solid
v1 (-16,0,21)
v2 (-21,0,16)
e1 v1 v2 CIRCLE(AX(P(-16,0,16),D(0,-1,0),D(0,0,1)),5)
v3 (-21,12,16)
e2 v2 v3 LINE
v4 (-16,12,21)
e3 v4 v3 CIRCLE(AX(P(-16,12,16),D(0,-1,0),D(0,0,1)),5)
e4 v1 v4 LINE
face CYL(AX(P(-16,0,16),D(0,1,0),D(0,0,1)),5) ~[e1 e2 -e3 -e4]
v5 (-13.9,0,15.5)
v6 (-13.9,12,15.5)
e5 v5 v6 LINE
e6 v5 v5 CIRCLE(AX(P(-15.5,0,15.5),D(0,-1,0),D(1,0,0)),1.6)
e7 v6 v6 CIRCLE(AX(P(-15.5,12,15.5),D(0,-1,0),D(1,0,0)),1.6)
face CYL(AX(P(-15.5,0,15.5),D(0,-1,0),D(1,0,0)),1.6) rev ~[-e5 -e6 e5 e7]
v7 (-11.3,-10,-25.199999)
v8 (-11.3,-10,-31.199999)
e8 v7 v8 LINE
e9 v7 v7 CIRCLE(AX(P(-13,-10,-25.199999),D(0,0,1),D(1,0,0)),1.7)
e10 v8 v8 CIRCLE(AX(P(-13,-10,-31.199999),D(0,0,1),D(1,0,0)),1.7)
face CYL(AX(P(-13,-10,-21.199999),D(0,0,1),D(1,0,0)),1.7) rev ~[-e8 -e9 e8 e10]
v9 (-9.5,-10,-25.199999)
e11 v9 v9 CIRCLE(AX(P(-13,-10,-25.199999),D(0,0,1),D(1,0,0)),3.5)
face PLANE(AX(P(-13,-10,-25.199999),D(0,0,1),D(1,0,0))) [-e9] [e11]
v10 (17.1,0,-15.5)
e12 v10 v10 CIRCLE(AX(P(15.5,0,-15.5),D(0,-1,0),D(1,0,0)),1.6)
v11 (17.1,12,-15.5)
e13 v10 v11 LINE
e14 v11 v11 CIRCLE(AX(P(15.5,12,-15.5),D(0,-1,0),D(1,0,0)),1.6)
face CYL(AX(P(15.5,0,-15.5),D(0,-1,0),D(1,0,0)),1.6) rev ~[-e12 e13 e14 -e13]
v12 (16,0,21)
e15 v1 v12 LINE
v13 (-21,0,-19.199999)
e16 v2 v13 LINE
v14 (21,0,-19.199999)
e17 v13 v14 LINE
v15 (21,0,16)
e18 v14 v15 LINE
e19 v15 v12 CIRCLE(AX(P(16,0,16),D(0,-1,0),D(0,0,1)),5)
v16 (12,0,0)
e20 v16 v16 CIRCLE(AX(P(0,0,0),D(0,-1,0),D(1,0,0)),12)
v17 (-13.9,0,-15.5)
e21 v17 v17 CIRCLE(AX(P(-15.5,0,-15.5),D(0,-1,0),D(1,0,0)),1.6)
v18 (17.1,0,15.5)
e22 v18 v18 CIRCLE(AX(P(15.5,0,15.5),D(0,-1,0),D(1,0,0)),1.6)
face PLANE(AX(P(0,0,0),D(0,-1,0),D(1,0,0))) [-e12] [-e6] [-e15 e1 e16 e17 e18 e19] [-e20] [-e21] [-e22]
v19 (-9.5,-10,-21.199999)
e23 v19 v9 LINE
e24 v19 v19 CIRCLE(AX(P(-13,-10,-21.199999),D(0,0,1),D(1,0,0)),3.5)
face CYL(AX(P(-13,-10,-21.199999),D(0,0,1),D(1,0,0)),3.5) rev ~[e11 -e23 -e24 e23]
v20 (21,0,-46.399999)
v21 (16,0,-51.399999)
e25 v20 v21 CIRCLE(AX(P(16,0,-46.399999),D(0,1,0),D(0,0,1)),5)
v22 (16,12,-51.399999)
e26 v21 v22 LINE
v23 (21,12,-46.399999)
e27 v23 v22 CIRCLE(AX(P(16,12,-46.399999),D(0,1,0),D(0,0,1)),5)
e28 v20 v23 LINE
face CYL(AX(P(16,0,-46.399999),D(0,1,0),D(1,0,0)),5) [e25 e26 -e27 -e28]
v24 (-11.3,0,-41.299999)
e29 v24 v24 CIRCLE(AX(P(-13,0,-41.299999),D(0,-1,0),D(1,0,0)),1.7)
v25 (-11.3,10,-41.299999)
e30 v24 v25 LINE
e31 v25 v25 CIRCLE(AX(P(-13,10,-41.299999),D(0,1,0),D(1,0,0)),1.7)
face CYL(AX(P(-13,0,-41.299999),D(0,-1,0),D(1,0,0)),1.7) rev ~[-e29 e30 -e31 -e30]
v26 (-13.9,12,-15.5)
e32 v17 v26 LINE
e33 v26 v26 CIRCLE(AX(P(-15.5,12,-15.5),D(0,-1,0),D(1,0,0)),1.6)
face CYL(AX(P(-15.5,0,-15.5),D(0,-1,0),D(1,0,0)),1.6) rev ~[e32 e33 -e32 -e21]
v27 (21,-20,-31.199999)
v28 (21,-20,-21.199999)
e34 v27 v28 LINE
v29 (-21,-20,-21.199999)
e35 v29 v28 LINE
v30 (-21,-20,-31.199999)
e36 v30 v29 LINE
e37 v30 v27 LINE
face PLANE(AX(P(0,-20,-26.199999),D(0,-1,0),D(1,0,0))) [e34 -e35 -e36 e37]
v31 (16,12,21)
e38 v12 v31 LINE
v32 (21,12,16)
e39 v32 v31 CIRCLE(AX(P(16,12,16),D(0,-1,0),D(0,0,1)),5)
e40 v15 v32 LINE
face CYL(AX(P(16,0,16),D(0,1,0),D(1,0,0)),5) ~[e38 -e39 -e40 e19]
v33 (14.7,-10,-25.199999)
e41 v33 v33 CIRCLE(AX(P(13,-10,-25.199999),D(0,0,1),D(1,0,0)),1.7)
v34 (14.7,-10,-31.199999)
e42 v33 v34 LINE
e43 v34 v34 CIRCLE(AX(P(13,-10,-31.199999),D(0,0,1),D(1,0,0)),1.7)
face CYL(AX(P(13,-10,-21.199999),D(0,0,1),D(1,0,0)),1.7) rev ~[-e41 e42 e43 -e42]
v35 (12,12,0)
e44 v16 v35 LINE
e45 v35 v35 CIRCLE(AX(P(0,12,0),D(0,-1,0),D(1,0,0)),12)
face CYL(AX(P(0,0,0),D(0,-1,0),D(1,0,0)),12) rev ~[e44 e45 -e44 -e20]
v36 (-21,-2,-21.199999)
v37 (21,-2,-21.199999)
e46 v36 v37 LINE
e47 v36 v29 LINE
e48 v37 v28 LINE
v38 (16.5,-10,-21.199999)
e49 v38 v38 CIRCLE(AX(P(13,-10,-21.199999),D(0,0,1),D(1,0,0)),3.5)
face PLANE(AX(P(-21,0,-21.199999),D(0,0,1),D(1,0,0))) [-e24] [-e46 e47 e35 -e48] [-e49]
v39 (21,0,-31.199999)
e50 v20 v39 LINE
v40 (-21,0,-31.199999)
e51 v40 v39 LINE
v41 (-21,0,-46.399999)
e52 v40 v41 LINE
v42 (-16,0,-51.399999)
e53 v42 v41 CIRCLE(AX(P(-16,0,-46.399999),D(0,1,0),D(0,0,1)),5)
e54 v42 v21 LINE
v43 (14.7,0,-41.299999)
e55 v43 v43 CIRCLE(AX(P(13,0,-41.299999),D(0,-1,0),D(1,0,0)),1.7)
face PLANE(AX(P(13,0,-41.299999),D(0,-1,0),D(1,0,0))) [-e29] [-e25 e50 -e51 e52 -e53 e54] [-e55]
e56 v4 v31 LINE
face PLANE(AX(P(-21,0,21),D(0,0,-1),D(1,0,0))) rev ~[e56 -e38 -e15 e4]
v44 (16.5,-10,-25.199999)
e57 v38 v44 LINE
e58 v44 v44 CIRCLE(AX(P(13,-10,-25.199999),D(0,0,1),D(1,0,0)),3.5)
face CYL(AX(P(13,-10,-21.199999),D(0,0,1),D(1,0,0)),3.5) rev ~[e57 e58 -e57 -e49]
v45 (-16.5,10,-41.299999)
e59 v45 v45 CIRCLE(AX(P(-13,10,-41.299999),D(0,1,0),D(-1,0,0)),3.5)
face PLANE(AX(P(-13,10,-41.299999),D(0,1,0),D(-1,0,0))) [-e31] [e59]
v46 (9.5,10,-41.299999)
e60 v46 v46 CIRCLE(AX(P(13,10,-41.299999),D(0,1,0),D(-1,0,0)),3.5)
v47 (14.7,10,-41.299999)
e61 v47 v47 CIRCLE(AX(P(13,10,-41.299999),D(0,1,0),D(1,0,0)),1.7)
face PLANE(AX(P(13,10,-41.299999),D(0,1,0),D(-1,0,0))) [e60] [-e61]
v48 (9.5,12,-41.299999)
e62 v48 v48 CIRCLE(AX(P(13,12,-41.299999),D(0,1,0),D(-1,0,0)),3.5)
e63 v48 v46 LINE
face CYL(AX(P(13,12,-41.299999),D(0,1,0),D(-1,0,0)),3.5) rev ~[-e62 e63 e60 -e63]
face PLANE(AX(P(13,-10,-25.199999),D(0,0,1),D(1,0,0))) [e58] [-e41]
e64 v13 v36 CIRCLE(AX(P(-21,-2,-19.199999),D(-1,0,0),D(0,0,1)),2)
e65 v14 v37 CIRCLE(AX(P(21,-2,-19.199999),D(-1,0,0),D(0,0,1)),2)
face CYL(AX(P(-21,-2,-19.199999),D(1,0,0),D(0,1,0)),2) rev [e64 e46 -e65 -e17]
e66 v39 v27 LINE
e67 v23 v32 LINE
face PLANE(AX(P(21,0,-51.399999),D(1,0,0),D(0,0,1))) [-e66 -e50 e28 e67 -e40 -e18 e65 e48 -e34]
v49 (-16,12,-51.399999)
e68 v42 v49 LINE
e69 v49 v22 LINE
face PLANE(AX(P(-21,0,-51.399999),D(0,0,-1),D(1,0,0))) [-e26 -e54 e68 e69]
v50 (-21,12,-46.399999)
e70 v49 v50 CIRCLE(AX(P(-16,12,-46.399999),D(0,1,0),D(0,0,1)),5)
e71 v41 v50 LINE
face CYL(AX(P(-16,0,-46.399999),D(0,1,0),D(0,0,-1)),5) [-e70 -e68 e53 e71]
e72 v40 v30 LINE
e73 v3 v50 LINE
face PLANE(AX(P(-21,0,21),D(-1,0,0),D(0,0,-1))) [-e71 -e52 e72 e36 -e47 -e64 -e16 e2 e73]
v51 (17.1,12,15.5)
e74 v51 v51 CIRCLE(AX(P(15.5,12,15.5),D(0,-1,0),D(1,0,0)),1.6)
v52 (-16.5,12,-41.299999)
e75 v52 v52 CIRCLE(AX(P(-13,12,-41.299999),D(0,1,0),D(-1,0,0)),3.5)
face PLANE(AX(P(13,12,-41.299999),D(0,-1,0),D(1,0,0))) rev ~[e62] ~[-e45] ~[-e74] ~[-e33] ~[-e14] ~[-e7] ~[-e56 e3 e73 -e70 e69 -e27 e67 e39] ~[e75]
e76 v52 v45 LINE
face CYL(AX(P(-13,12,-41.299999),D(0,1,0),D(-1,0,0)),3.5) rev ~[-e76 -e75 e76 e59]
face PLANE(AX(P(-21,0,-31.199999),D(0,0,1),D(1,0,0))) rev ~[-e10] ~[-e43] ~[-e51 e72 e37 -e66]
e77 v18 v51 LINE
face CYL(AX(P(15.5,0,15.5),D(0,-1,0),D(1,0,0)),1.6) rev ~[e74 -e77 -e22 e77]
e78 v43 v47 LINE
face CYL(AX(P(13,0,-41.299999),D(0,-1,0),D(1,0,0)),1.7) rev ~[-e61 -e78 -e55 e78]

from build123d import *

# Parameters (mm, degrees)
F0_W     = 42
F0_H     = 10
F1_DEPTH = 20
F0_H_2   = 42
F0_R     = 1.6
F0_R_2   = 12
F0_H_3   = 20.2
F0_R_3   = 3.5
F0_H_4   = 0.1999993771
F2_DEPTH = 12
F3_R     = 1.7
F4_DEPTH = 25
F3_R_2   = 3.5
F5_DEPTH = 4
F0_R_4   = 1.7
F6_DEPTH = 12
F7_R     = 3.5
F7_R_2   = 1.7
F8_DEPTH = 2
F9_R     = 5
F10_R    = 2


# Not quite as in the source:
# - a feature names something its author has since deleted; it is built from what else it names


with BuildPart() as f1:
    # F0 (on Front) → F1 (new body)
    with BuildSketch(Plane.XZ):
        with Locations((0, -26.1999993771)):
            Rectangle(F0_W, F0_H)
    extrude(amount=F1_DEPTH)

    # F0 (on Front) → F2 (join)
    with BuildSketch(Plane.XZ):
        Rectangle(F0_W, F0_H_2)
        with Locations((-15.5, -15.5)):
            Circle(F0_R, mode=Mode.SUBTRACT)
        with Locations((15.5, -15.5)):
            Circle(F0_R, mode=Mode.SUBTRACT)
        with Locations((-15.5, 15.5)):
            Circle(F0_R, mode=Mode.SUBTRACT)
        Circle(F0_R_2, mode=Mode.SUBTRACT)
        with Locations((15.5, 15.5)):
            Circle(F0_R, mode=Mode.SUBTRACT)
        with Locations((0, -26.1999993771)):
            Rectangle(F0_W, F0_H)
        with Locations((0, -41.2999993771)):
            Rectangle(F0_W, F0_H_3)
        with Locations((-13, -41.2999993771)):
            Circle(F0_R_3, mode=Mode.SUBTRACT)
        with Locations((13, -41.2999993771)):
            Circle(F0_R_3, mode=Mode.SUBTRACT)
        with Locations((0, -21.0999996886)):
            Rectangle(F0_W, F0_H_4)
    extrude(amount=-F2_DEPTH)

    # F3 (on face) → F4 (cut)
    with BuildSketch(Plane.XY.offset(-21.1999993771)):
        with Locations((-13, -10)):
            Circle(F3_R)
        with Locations((13, -10)):
            Circle(F3_R)
    extrude(amount=-F4_DEPTH, mode=Mode.SUBTRACT)

    # F3 (on face) → F5 (cut)
    with BuildSketch(Plane.XY.offset(-21.1999993771)):
        with Locations((-13, -10)):
            Circle(F3_R_2)
        with Locations((-13, -10)):
            Circle(F3_R, mode=Mode.SUBTRACT)
        with Locations((13, -10)):
            Circle(F3_R_2)
        with Locations((13, -10)):
            Circle(F3_R, mode=Mode.SUBTRACT)
    extrude(amount=-F5_DEPTH, mode=Mode.SUBTRACT)

    # F0 (on Front) → F6 (join)
    with BuildSketch(Plane.XZ):
        with Locations((13, -41.2999993771)):
            Circle(F0_R_3)
        with Locations((13, -41.2999993771)):
            Circle(F0_R_4, mode=Mode.SUBTRACT)
        with Locations((-13, -41.2999993771)):
            Circle(F0_R_3)
        with Locations((-13, -41.2999993771)):
            Circle(F0_R_4, mode=Mode.SUBTRACT)
    extrude(amount=-F6_DEPTH)

    # F7 (on face) → F8 (cut)
    with BuildSketch(Plane(origin=(0, 12, 0), x_dir=(-1, 0, 0), z_dir=(0, 1, 0))):
        with Locations((-13, -41.2999993771)):
            Circle(F7_R)
        with Locations((-13, -41.2999993771)):
            Circle(F7_R_2, mode=Mode.SUBTRACT)
        with Locations((13, -41.2999993771)):
            Circle(F7_R)
        with Locations((13, -41.2999993771)):
            Circle(F7_R_2, mode=Mode.SUBTRACT)
    extrude(amount=-F8_DEPTH, mode=Mode.SUBTRACT)

    # F9
    f9_edges = [f1.edges().sort_by_distance(p)[0] for p in [
        (21, 6, 21),
        (-21, 6, 21),
        (-21, 6, -51.399999),
        (21, 6, -51.399999),
    ]]
    fillet(f9_edges, radius=F9_R)

    # F10
    f10_edges = [f1.edges().sort_by_distance(p)[0] for p in [
        (0, 0, -21.199999),
    ]]
    fillet(f10_edges, radius=F10_R)


solid = f1.part
